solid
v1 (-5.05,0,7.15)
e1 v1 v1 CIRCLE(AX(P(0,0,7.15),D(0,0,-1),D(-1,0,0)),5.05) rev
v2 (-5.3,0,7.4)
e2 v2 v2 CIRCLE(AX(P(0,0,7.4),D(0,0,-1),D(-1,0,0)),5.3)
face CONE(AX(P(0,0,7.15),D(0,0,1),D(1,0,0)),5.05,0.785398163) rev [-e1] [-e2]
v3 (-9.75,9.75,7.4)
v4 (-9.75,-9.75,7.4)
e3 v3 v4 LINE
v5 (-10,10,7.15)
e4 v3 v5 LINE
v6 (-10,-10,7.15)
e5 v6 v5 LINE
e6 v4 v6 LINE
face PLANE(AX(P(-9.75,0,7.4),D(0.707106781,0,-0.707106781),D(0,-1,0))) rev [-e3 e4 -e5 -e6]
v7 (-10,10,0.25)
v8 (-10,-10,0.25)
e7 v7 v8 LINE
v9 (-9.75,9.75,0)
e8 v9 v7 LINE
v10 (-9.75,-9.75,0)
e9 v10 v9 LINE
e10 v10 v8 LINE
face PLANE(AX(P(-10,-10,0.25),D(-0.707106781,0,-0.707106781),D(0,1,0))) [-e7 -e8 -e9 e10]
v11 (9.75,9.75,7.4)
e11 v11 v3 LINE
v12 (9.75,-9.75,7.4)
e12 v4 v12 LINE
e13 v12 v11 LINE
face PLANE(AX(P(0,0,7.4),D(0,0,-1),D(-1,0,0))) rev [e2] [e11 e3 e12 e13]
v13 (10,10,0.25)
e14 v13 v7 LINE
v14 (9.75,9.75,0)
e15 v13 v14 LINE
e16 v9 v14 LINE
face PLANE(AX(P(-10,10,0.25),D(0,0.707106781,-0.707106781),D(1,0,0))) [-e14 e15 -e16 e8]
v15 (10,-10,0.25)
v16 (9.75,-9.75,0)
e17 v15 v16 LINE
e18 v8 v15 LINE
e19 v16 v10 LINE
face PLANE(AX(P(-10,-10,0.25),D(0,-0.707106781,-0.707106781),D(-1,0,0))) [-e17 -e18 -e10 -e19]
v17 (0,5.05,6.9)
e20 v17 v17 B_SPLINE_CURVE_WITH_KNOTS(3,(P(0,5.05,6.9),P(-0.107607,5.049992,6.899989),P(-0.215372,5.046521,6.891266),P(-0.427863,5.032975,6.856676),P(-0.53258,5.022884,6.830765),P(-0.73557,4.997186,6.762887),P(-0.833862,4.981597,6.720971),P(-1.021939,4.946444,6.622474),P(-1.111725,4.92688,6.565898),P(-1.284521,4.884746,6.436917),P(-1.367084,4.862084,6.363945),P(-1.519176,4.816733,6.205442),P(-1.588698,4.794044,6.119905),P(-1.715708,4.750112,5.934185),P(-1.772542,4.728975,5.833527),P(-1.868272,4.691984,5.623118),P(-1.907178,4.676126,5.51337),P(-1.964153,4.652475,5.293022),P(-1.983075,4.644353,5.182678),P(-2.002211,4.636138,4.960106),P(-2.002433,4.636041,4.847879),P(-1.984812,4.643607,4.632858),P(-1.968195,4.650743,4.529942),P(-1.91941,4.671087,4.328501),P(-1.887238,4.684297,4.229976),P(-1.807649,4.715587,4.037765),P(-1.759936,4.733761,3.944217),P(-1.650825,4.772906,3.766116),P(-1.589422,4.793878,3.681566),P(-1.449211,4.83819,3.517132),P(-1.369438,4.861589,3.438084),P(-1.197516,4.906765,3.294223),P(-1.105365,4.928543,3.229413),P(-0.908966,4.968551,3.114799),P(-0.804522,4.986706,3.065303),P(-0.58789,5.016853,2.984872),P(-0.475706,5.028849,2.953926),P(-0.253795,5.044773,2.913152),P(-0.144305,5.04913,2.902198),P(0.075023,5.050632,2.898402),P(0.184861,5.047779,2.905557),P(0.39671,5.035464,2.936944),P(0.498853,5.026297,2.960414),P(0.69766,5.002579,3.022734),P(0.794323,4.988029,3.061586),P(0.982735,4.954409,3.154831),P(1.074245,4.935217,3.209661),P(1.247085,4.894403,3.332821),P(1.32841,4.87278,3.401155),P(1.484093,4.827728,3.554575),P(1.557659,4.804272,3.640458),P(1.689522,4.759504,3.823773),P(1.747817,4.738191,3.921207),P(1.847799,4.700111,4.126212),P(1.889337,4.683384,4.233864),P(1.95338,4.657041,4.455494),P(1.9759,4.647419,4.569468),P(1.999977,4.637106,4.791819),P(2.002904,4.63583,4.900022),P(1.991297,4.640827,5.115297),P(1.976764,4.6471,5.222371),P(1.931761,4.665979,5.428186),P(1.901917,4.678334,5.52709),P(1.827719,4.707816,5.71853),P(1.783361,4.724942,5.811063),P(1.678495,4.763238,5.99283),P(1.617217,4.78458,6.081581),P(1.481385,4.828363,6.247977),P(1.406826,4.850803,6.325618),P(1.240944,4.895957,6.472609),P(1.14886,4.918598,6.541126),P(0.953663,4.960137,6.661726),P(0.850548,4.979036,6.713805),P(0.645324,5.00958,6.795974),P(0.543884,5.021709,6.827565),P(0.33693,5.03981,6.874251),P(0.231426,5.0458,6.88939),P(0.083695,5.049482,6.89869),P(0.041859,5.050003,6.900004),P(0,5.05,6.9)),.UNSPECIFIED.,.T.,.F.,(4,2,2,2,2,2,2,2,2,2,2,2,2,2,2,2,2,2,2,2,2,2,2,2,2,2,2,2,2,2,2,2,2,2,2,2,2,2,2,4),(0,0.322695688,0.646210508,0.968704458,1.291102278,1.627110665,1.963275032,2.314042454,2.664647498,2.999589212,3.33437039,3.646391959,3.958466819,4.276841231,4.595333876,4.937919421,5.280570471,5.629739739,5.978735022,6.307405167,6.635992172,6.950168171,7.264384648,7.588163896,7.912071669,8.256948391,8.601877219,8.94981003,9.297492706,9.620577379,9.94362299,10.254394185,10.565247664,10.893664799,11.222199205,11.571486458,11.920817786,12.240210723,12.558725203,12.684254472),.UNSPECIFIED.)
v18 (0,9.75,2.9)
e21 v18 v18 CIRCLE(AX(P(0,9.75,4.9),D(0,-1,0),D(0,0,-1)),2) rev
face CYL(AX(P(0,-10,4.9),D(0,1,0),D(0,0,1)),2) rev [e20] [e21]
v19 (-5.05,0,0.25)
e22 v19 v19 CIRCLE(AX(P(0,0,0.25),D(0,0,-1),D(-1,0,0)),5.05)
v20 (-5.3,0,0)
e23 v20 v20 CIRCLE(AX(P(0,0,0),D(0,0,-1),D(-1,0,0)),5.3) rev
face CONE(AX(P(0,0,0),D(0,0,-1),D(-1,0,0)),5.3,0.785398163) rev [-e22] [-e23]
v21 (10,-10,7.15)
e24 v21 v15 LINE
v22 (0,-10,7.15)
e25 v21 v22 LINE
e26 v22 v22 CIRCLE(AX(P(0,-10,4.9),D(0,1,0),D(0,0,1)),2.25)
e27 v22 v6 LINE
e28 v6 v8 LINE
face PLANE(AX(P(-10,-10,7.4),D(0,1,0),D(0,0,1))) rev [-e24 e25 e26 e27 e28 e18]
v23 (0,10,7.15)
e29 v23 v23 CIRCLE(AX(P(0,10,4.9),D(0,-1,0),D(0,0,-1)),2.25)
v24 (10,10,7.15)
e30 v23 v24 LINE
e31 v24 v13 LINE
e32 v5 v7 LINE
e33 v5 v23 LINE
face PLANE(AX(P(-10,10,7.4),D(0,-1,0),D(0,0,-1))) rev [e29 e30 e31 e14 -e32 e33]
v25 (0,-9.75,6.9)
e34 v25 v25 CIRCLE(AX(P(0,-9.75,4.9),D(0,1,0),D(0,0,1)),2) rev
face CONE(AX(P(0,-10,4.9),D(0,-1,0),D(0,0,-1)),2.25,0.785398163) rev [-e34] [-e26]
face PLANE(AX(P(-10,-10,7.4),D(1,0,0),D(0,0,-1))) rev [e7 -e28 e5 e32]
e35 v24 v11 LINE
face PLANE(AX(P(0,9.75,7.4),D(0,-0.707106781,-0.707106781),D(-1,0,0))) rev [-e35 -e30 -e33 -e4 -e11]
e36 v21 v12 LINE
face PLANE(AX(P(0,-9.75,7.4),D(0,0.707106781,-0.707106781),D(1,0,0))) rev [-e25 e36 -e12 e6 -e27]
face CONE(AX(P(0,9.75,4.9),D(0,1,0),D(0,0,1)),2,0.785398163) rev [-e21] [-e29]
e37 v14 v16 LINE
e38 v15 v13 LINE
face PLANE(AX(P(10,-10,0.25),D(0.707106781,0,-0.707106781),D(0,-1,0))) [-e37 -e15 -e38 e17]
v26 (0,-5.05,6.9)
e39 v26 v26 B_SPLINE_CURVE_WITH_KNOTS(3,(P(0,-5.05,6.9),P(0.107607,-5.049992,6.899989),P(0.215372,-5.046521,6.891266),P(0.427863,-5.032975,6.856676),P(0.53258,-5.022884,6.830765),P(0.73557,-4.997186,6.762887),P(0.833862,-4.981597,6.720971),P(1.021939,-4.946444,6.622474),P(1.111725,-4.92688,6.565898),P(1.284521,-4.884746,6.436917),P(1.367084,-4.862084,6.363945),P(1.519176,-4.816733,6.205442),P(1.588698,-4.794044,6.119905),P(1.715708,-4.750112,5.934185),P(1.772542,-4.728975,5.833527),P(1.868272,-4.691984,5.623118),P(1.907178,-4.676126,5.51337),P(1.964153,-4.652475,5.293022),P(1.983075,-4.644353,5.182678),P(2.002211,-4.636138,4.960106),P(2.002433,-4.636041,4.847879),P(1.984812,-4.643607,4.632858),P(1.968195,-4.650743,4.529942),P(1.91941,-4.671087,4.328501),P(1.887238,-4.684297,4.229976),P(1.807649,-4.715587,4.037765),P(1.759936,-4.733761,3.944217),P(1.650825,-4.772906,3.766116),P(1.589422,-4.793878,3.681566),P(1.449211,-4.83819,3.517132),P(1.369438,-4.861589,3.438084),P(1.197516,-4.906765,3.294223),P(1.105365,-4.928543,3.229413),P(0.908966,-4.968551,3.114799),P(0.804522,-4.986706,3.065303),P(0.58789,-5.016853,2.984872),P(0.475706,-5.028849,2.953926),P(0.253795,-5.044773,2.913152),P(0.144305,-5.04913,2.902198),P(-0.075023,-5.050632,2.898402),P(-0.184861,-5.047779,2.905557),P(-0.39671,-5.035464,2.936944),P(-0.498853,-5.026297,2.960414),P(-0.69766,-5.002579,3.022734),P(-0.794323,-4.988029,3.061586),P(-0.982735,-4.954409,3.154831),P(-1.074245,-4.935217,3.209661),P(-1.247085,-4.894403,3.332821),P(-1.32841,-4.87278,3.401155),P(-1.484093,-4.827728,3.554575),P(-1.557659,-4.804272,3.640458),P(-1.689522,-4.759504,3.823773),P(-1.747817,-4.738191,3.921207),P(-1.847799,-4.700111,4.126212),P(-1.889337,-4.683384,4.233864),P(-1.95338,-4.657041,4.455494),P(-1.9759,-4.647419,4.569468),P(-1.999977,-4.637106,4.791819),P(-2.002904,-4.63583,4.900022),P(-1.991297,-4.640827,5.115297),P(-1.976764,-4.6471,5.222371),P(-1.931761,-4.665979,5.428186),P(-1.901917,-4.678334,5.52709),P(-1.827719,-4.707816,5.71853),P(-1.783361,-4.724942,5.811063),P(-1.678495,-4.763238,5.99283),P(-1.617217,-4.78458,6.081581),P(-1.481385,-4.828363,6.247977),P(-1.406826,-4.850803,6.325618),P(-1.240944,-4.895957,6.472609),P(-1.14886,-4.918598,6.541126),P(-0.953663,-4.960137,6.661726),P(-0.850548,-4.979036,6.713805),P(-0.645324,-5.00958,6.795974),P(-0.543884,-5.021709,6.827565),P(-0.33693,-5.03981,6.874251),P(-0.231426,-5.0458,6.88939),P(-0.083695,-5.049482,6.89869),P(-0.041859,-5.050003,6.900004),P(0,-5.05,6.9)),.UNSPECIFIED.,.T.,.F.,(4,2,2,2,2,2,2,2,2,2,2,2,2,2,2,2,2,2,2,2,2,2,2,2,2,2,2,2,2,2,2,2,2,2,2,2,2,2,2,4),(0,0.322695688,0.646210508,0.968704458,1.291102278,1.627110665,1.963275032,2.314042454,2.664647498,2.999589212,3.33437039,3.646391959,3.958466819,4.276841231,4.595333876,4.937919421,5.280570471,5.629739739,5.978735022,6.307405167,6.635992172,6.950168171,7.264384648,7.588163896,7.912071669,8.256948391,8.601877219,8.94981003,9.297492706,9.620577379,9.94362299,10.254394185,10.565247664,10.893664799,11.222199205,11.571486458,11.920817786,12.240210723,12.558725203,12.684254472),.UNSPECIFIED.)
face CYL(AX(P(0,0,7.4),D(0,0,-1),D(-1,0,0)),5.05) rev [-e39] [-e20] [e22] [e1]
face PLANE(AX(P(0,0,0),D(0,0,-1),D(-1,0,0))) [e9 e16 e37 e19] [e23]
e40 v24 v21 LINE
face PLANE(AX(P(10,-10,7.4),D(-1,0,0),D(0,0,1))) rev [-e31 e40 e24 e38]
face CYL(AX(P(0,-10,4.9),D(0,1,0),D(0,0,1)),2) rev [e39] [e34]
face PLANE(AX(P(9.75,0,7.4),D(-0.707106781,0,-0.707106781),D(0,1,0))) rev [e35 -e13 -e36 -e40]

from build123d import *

# Parameters (mm, degrees)
SKETCH1_W               = 20
SKETCH1_H               = 20
SKETCH1_R               = 5.05
BOSS_EXTRUDE1_DEPTH     = 7.4
CUT_EXTRUDE1_DEPTH      = 16.961202962
CUT_EXTRUDE1_DEPTH_BACK = 16.961202962
SKETCH2_R               = 2
CHAMFER1_SIZE           = 0.25


with BuildPart() as part:
    # Sketch1 → Boss-Extrude1 (new body)
    with BuildSketch(Plane.XY):
        Rectangle(SKETCH1_W, SKETCH1_H)
        Circle(SKETCH1_R, mode=Mode.SUBTRACT)
    extrude(amount=BOSS_EXTRUDE1_DEPTH)

    # Sketch2 → Cut-Extrude1 (cut, two sides: drawn at the far end of the back side and taken through both)
    with BuildSketch(Plane(origin=(0, 0, 0), x_dir=(1, 0, 0), z_dir=(0, 1, 0)).offset(-CUT_EXTRUDE1_DEPTH_BACK)):
        with Locations(Location((0, -4.9, 0), (0, 0, 270))):
            Circle(SKETCH2_R)
    extrude(amount=CUT_EXTRUDE1_DEPTH + CUT_EXTRUDE1_DEPTH_BACK, mode=Mode.SUBTRACT)

    # Chamfer1
    chamfer1_edges = [part.edges().sort_by_distance(p)[0] for p in [
        (-5.05, 0, 0),
        (-5.05, 0, 7.4),
        (-10, 0, 7.4),
        (0, -10, 7.4),
        (0, -10, 2.9),
        (0, 10, 2.9),
        (10, 0, 7.4),
        (0, -10, 0),
        (-10, 0, 0),
        (0, 10, 0),
        (10, 0, 0),
        (0, 10, 7.4),
    ]]
    chamfer(chamfer1_edges, length=CHAMFER1_SIZE - 0.0001)  # a hair under: the kernel refuses the full size


solid = part.part
